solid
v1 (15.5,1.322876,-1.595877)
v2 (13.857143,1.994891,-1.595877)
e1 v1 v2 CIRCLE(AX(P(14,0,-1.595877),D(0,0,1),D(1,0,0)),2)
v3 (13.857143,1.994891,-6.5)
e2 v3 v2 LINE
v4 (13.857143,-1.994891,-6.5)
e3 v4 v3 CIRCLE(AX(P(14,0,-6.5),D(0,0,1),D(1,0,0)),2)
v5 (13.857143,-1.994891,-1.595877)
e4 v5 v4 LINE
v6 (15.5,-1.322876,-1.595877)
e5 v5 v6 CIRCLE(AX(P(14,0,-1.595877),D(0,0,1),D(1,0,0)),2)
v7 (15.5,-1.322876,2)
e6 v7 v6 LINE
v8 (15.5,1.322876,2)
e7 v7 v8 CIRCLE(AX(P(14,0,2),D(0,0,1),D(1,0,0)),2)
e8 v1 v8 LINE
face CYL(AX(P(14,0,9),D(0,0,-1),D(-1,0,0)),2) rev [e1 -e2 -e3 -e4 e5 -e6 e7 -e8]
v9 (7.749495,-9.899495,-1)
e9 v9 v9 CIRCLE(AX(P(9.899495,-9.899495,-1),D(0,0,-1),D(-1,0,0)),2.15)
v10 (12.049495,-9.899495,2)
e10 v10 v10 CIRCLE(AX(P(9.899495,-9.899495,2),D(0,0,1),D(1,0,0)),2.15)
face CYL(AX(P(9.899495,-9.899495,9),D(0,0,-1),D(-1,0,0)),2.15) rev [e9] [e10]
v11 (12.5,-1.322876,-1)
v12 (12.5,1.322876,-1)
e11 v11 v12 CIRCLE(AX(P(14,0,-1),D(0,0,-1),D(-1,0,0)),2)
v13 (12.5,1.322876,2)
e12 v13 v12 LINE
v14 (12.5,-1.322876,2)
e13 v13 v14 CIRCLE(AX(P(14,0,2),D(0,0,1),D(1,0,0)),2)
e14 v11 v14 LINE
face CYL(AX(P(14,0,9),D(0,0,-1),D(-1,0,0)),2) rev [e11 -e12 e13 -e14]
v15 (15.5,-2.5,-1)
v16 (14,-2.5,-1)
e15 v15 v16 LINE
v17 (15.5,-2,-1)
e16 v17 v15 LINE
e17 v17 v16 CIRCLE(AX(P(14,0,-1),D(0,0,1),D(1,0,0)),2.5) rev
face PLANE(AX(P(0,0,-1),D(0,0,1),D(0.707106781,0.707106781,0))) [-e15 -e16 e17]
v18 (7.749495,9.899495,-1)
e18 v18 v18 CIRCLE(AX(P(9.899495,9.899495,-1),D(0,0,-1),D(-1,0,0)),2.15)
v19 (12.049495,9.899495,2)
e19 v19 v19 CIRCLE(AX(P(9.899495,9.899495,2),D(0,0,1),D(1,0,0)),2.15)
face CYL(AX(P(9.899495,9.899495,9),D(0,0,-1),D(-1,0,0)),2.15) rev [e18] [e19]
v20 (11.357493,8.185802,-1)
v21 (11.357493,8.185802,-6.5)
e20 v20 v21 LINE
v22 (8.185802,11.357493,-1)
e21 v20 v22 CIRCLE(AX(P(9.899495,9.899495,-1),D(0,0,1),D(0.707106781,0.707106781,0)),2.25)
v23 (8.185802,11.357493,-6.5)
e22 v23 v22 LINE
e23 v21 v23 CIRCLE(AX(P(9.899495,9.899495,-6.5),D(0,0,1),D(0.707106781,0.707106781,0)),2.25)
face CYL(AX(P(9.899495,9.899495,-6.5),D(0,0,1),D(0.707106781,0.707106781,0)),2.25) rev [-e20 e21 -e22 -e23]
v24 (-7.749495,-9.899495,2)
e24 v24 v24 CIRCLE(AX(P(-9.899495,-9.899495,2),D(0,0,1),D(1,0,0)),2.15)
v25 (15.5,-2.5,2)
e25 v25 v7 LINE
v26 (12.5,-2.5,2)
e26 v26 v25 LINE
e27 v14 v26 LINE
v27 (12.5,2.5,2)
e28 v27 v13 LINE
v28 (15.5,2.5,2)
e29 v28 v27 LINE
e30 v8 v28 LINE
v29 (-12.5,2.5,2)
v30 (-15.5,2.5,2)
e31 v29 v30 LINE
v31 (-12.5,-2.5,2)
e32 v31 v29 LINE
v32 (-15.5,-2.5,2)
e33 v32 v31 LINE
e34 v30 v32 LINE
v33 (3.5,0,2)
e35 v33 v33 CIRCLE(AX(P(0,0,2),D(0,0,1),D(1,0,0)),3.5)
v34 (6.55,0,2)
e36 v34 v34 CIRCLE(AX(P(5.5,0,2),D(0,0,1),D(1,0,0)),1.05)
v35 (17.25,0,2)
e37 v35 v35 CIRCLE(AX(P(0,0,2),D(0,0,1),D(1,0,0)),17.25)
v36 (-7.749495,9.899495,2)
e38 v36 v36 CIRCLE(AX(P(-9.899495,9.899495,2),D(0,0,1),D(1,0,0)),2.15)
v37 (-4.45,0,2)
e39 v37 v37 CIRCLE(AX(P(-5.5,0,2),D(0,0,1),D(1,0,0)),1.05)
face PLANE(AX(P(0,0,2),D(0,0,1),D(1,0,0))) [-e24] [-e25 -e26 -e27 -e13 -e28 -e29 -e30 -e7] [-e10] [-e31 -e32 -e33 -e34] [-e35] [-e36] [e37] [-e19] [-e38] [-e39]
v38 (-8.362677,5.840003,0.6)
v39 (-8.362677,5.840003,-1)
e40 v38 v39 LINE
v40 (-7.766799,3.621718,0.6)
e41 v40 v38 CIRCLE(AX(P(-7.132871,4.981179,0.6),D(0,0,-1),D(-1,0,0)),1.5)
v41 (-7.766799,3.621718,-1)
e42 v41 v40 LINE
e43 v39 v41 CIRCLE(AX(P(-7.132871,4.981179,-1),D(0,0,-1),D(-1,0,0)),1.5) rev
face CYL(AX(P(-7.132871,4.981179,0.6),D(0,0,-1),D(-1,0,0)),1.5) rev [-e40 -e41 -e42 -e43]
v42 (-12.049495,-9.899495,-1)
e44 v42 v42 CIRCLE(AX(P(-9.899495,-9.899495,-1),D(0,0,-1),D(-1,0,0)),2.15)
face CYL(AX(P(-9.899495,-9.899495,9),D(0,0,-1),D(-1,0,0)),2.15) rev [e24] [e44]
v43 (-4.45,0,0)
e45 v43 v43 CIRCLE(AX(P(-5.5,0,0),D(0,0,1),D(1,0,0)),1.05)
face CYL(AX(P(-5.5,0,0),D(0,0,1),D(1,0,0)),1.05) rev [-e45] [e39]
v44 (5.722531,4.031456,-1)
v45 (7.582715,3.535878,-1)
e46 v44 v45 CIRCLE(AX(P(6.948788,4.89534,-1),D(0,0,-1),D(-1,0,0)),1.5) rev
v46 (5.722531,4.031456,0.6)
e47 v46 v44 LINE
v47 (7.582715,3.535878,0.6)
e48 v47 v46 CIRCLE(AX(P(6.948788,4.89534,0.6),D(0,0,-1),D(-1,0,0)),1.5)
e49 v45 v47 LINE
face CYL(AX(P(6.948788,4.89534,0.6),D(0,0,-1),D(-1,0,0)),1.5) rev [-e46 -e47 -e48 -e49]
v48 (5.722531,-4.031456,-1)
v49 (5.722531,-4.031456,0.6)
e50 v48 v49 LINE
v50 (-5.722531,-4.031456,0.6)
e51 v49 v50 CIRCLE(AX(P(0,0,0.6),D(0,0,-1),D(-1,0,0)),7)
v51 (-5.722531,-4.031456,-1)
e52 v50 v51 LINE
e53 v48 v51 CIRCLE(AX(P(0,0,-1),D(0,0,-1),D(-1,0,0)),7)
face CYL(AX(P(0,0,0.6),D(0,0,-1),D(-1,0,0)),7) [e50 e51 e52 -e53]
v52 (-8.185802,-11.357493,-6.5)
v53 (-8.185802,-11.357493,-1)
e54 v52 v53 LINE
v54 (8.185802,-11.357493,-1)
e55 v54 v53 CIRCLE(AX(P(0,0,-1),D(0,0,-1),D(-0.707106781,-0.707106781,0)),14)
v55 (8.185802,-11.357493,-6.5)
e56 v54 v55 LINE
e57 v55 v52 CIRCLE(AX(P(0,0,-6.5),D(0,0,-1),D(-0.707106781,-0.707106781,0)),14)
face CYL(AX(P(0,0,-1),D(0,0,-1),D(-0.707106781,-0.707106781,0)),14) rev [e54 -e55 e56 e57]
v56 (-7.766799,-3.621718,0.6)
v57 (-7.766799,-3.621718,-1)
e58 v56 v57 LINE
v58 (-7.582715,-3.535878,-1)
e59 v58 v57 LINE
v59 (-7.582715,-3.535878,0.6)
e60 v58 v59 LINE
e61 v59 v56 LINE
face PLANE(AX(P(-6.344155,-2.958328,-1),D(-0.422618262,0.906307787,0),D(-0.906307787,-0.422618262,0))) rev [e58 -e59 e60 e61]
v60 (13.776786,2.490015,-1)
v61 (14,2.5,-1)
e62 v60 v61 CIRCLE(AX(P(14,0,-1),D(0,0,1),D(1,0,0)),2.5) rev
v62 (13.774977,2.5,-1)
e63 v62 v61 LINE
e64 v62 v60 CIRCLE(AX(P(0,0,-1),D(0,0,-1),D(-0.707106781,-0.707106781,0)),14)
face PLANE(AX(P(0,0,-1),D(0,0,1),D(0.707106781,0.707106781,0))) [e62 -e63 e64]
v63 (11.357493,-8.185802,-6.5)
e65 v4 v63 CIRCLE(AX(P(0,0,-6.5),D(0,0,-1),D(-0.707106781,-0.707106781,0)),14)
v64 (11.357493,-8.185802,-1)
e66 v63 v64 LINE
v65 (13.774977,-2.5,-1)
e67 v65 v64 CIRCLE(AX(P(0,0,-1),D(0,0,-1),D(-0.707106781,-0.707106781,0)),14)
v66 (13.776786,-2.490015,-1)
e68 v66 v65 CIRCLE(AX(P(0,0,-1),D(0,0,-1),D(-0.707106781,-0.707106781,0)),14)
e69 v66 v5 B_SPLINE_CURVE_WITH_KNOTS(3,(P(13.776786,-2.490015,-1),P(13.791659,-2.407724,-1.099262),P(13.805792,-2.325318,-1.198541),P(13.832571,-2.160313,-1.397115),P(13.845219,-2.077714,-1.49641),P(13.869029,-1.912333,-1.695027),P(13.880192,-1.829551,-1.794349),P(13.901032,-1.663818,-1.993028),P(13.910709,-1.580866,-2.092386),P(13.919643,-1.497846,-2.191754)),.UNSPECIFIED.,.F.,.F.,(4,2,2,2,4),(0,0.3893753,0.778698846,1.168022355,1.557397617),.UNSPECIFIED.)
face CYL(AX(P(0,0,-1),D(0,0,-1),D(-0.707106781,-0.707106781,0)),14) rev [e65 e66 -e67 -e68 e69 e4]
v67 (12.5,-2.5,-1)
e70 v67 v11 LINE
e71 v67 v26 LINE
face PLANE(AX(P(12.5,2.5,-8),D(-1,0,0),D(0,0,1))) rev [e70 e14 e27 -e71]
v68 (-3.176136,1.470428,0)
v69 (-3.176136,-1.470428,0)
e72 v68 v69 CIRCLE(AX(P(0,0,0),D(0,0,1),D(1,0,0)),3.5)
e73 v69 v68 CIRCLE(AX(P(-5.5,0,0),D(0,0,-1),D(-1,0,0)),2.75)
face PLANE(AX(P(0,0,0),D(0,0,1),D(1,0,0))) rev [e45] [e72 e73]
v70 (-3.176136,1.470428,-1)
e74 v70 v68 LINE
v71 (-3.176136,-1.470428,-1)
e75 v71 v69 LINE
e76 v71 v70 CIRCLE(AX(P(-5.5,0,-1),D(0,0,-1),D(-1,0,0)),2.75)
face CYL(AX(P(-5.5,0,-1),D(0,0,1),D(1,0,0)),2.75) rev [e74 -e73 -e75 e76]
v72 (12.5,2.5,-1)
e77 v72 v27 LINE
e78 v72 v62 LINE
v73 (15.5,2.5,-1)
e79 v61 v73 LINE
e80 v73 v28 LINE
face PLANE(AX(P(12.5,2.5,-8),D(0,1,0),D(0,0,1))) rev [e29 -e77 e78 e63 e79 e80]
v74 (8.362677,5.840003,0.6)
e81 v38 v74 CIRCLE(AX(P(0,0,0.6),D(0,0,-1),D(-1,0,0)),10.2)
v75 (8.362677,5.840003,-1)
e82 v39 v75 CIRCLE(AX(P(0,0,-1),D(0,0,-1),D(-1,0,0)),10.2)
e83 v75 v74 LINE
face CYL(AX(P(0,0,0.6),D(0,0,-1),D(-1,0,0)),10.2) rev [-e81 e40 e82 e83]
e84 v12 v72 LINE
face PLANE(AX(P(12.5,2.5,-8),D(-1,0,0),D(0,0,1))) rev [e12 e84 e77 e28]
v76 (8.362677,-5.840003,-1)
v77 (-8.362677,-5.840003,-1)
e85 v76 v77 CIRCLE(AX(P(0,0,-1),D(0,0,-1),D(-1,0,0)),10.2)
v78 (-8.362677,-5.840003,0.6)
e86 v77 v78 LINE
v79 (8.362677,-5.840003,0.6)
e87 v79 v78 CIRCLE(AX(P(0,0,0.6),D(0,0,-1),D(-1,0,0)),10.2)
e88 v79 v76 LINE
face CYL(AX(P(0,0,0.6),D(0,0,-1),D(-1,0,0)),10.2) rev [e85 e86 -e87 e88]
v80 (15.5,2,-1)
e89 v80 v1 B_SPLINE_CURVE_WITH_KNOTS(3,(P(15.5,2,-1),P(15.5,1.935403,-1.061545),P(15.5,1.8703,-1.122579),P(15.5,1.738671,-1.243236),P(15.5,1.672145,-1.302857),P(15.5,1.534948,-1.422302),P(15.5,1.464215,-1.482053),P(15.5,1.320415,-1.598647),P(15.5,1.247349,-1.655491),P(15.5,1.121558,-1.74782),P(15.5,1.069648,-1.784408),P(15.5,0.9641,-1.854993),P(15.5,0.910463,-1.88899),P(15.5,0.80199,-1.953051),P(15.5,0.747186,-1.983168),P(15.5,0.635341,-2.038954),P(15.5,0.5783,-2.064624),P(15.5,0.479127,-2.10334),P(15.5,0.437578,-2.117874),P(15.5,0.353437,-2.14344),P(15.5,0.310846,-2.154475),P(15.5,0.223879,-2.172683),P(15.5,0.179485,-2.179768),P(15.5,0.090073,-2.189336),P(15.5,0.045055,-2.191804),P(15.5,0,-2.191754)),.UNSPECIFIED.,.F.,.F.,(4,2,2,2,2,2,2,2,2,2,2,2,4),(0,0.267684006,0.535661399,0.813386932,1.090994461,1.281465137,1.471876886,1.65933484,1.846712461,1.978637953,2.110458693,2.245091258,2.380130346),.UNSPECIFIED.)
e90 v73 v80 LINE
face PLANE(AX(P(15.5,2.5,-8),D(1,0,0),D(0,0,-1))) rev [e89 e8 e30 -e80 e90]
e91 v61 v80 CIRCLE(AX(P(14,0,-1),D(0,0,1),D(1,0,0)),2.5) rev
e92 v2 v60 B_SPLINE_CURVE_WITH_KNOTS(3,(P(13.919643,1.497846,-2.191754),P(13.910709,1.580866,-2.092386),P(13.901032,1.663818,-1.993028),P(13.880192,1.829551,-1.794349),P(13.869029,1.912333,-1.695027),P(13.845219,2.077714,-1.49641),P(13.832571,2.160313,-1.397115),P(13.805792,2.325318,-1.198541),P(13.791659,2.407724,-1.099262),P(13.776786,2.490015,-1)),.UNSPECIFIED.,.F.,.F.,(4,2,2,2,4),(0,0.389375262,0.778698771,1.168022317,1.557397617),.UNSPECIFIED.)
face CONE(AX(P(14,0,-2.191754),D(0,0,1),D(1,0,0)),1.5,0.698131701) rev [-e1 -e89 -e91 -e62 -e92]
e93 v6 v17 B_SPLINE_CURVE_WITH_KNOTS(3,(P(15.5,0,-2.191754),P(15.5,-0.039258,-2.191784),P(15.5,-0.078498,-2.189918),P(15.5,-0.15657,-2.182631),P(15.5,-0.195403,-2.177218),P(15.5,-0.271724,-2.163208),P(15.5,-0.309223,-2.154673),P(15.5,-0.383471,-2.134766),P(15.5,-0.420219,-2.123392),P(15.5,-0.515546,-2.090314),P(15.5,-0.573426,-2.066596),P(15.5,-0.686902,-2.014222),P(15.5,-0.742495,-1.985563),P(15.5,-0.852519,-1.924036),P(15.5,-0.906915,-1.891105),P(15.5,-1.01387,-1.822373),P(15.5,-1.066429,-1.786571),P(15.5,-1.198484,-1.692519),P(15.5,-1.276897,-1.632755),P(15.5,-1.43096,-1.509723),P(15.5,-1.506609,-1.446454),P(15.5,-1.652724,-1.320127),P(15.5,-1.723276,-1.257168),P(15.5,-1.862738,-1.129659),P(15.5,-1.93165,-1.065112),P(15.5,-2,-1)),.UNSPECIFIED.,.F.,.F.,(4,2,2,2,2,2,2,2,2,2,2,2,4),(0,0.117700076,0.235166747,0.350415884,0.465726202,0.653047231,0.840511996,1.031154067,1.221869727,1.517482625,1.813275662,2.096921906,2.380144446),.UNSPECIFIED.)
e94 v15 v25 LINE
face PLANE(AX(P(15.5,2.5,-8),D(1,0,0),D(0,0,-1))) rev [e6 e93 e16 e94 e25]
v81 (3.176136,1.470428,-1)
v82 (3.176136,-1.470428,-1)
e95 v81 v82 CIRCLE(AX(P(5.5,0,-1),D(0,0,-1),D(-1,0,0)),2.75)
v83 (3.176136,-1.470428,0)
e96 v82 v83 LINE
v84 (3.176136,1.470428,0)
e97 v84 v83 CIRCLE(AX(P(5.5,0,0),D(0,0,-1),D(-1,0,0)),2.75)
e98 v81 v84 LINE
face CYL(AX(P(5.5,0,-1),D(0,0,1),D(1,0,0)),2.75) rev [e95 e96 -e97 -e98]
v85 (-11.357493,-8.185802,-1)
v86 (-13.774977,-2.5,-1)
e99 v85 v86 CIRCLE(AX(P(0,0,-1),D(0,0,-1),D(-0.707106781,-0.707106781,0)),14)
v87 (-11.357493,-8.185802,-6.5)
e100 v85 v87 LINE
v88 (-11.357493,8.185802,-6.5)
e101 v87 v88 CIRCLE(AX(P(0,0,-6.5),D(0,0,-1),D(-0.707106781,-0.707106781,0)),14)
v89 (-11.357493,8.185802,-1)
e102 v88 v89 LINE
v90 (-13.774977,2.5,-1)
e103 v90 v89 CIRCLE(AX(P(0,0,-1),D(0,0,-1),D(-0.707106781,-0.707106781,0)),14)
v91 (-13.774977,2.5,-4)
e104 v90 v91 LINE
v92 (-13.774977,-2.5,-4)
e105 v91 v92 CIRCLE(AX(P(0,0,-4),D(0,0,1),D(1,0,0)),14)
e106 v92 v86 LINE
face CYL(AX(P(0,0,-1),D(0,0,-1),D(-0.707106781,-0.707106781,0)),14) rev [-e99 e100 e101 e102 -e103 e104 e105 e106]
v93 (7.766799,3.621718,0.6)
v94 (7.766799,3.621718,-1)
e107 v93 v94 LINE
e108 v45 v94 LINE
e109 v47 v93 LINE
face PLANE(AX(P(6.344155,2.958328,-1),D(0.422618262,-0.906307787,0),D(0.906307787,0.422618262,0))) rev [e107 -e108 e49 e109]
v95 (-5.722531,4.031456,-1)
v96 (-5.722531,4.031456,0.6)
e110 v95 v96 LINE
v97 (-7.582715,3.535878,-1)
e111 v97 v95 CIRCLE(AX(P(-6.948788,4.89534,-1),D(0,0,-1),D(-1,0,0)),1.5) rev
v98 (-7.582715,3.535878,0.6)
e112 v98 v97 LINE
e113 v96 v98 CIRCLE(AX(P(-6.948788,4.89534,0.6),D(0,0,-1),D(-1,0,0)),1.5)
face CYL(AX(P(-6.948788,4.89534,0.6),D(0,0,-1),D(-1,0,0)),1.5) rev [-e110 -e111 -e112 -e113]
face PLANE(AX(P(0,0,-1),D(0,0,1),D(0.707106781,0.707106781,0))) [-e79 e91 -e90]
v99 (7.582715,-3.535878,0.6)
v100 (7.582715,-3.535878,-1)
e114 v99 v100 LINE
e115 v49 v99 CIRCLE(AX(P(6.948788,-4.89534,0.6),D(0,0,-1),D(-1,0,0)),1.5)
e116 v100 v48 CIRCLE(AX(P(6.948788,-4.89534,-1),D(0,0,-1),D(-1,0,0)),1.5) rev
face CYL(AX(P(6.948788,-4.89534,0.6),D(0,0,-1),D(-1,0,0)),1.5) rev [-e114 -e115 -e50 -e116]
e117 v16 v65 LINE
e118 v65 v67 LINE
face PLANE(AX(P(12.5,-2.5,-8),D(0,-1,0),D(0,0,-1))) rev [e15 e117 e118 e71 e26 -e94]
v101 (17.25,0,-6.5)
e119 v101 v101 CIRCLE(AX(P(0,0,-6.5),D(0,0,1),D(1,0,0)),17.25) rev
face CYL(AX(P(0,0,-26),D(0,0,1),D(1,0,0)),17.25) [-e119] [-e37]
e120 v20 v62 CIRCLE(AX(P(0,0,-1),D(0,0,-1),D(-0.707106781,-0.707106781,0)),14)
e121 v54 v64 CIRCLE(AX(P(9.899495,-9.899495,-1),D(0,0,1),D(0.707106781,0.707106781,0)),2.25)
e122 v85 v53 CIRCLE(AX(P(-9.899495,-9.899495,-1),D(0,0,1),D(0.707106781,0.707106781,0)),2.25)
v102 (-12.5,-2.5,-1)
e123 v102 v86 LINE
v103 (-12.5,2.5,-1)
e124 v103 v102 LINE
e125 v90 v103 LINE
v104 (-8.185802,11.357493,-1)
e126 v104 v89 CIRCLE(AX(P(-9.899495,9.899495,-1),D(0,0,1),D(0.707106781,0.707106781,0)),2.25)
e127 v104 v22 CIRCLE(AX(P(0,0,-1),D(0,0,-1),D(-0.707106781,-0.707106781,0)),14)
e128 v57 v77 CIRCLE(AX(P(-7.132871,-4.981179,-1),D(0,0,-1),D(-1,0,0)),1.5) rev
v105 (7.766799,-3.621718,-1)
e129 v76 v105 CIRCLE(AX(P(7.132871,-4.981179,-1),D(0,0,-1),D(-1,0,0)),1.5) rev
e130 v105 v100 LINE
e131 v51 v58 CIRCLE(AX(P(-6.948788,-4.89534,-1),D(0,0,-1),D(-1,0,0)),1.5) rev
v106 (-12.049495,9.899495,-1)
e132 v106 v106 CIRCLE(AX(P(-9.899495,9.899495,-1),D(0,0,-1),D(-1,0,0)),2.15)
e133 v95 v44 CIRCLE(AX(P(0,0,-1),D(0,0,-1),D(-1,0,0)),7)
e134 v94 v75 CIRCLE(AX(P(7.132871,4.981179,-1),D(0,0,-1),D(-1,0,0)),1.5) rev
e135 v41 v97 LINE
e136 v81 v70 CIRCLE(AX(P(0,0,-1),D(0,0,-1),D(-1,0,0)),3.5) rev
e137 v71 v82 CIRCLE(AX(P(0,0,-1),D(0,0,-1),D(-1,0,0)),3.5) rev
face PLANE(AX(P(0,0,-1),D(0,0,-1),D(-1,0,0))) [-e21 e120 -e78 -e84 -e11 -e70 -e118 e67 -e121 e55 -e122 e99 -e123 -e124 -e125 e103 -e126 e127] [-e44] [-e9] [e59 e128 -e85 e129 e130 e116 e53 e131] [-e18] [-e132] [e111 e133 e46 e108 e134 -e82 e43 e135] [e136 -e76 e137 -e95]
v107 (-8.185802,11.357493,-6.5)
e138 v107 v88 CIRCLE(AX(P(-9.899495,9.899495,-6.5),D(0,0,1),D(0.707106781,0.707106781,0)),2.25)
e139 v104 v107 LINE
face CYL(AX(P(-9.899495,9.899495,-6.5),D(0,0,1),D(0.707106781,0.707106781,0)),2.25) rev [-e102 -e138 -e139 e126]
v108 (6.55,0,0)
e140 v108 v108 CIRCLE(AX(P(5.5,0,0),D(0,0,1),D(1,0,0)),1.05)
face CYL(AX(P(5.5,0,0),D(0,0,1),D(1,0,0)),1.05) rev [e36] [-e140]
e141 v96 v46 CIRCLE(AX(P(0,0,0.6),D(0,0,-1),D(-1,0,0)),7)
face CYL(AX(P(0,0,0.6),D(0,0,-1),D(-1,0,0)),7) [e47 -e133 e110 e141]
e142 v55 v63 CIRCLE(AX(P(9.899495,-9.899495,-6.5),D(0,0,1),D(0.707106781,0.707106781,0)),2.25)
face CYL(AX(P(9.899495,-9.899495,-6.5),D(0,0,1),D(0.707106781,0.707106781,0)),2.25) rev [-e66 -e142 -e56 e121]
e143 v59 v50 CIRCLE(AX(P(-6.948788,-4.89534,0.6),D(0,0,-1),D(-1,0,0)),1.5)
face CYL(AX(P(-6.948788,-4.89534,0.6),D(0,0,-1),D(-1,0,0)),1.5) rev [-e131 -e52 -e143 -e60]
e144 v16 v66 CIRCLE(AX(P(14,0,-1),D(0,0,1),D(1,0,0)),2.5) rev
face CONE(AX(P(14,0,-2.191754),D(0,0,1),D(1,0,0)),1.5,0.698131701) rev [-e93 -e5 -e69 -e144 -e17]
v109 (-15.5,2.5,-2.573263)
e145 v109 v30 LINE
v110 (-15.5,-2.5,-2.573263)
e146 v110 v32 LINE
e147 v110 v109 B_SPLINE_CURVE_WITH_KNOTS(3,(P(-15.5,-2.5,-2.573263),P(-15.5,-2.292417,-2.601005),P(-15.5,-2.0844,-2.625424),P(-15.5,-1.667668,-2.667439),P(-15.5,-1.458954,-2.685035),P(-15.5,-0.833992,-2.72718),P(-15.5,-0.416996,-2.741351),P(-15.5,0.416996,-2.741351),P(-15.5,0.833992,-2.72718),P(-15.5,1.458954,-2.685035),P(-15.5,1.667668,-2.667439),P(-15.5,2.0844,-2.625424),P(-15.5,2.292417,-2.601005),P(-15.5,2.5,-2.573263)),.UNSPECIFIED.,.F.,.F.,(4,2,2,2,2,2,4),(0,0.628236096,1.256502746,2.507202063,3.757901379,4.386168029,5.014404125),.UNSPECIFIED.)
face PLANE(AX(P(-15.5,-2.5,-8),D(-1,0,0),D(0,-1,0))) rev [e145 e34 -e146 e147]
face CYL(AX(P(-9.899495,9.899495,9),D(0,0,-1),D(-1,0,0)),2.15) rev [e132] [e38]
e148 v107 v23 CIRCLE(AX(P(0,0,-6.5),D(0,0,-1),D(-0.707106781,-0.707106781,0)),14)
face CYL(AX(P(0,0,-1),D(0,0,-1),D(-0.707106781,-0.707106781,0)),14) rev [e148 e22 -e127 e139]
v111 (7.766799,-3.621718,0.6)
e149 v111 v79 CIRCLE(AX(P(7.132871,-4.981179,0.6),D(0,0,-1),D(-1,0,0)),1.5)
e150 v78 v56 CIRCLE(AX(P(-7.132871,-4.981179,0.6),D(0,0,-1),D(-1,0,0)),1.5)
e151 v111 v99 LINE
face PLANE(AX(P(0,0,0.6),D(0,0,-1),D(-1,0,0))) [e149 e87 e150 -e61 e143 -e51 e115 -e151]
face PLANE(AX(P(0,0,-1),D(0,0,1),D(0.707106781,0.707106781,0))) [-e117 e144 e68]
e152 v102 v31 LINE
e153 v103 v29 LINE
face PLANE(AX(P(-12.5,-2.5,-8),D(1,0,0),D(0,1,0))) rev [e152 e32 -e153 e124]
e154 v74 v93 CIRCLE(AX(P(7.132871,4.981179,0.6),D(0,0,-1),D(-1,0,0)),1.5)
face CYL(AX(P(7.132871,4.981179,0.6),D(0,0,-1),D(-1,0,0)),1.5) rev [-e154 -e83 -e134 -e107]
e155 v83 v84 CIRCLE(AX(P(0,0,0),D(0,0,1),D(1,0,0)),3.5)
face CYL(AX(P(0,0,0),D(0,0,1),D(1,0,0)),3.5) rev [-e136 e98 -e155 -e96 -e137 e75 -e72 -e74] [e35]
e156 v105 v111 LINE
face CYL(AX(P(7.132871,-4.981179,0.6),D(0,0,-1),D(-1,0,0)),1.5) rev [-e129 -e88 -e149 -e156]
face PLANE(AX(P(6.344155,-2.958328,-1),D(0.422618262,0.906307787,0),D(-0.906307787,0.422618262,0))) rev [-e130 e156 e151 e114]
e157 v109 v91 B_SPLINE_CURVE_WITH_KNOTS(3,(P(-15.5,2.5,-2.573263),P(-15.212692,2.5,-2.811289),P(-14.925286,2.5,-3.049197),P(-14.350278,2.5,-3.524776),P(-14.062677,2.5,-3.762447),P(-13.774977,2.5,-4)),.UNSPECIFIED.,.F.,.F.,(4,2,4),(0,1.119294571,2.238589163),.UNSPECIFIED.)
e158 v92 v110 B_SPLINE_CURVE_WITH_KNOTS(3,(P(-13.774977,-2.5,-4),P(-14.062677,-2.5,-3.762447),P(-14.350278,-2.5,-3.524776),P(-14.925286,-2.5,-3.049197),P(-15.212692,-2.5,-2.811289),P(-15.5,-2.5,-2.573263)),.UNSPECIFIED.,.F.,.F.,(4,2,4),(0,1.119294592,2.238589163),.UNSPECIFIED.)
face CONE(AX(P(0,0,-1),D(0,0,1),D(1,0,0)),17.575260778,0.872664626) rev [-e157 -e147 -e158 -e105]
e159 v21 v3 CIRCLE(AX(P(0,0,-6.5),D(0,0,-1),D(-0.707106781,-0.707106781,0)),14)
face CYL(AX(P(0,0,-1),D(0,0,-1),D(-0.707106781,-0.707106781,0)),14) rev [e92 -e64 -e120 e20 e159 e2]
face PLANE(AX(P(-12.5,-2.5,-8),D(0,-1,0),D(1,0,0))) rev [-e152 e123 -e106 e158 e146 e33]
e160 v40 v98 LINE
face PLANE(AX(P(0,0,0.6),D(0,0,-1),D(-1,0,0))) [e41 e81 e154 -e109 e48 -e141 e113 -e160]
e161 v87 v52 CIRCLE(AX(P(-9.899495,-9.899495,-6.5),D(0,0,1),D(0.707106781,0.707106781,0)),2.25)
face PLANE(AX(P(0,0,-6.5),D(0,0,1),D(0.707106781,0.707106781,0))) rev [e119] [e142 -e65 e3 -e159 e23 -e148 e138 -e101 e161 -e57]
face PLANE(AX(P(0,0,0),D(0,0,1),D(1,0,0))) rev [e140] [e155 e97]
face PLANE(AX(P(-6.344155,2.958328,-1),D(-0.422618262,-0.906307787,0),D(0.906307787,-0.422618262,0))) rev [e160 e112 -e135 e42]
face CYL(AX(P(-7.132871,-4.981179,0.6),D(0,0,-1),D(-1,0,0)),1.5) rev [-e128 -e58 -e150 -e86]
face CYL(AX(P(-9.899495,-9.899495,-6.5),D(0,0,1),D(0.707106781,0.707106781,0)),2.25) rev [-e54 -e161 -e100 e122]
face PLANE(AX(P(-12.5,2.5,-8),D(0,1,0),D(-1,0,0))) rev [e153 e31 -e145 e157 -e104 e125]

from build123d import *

# Parameters (mm, degrees)
SKETCH_1_R               = 20
EXTRUDE_1_DEPTH          = 2
SKETCH_2_R               = 3.5
CUT_EXTRUDE_1_DEPTH      = 2
SKETCH_3_R               = 1.05
CUT_EXTRUDE_2_DEPTH      = 2
EXTRUDE_START            = 1
SKETCH_5_R               = 20
SKETCH_5_R_2             = 8.25
EXTRUDE_3_DEPTH          = 1
EXTRUDE_4_DEPTH          = 1
SKETCH_9_R               = 10.2
SKETCH_9_R_2             = 7
CUT_EXTRUDE_3_DEPTH      = 1.6
EXTRUDE_START_2          = 1.6
EXTRUDE_5_DEPTH          = 1.6
PATTERN_CIRCULAR_2_COUNT = 2
SKETCH_13_R              = 2.75
CUT_EXTRUDE_4_DEPTH      = 1.6
FILLET_1_R               = 1.5
SKETCH_14_R              = 2.15
CUT_EXTRUDE_5_DEPTH      = 10
SKETCH_15_W              = 3
SKETCH_15_H              = 5
CUT_EXTRUDE_6_DEPTH      = 10
CHAMFER_1_SIZE           = 1
OTHER_START              = -10.264946541
OTHER_4149_OUTLINE_R     = 17.5
OTHER_4149_DEPTH         = 5.5
MOVE_BODY_2_ANGLE        = 45
CHAMFER_2_SIZE           = 1.191753593
CHAMFER_2_SIZE_2         = 1
CHAMFER_3_SIZE           = 3.575260778
CHAMFER_3_SIZE_2         = 3
SKETCH_19_OUTSIDE_W      = 53.44
SKETCH_19_OUTSIDE_H      = 53.44
SKETCH_19_OUTSIDE_R      = 17.25
CUT_EXTRUDE_7_DEPTH      = 25
CUT_EXTRUDE_9_DEPTH      = 10
CUT_EXTRUDE_9_DEPTH_BACK = 10
SKETCH_21_R              = 2
SKETCH_22_OUTSIDE_W      = 53.44
SKETCH_22_OUTSIDE_H      = 53.44
SKETCH_22_OUTSIDE_R      = 17.25
CUT_EXTRUDE_10_DEPTH     = 10


with BuildPart() as part:
    # 草图1 → 凸台-拉伸1 (new body)
    with BuildSketch(Plane.XY):
        Circle(SKETCH_1_R)
    extrude(amount=EXTRUDE_1_DEPTH)

    # 草图2 → 切除-拉伸1 (cut)
    with BuildSketch(Plane.XY.offset(2)):
        Circle(SKETCH_2_R)
    extrude(amount=-CUT_EXTRUDE_1_DEPTH, mode=Mode.SUBTRACT)

    # 草图3 → 切除-拉伸2 (cut)
    with BuildSketch(Plane.XY.offset(2)):
        with Locations((-5.5, 0)):
            Circle(SKETCH_3_R)
        with Locations((5.5, 0)):
            Circle(SKETCH_3_R)
    extrude(amount=-CUT_EXTRUDE_2_DEPTH, mode=Mode.SUBTRACT)

    # 草图5 → 凸台-拉伸3 (add)
    with BuildSketch(Plane(origin=(0, 0, 0), x_dir=(-1, 0, 0), z_dir=(0, 0, -1)).offset(EXTRUDE_START)):
        Circle(SKETCH_5_R)
        Circle(SKETCH_5_R_2, mode=Mode.SUBTRACT)
    extrude(amount=-EXTRUDE_3_DEPTH)

    # 草图8 → 凸台-拉伸4 (add)
    with BuildSketch(Plane(origin=(0, 0, 0), x_dir=(-1, 0, 0), z_dir=(0, 0, -1))):
        with BuildLine():
            ThreePointArc((3.176136364, 1.470427761), (6.265465545, 2.641318326), (8.25, 0))
            ThreePointArc((8.25, 0), (0, 8.25), (-8.25, 0))
            ThreePointArc((-8.25, 0), (-6.265465545, 2.641318326), (-3.176136364, 1.470427761))
            ThreePointArc((-3.176136364, 1.470427761), (0, 3.5), (3.176136364, 1.470427761))
        make_face()
        with BuildLine():
            ThreePointArc((-8.25, 0), (0, -8.25), (8.25, 0))
            ThreePointArc((8.25, 0), (6.265465545, -2.641318326), (3.176136364, -1.470427761))
            ThreePointArc((3.176136364, -1.470427761), (0, -3.5), (-3.176136364, -1.470427761))
            ThreePointArc((-3.176136364, -1.470427761), (-6.265465545, -2.641318326), (-8.25, 0))
        make_face()
    extrude(amount=EXTRUDE_4_DEPTH)

    # 草图9 → 切除-拉伸3 (cut)
    with BuildSketch(Plane(origin=(0, 0, -1), x_dir=(-1, 0, 0), z_dir=(0, 0, -1))):
        Circle(SKETCH_9_R)
        Circle(SKETCH_9_R_2, mode=Mode.SUBTRACT)
    extrude(amount=-CUT_EXTRUDE_3_DEPTH, mode=Mode.SUBTRACT)

    # 草图12 → 凸台-拉伸5 (add)
    with BuildSketch(Plane(origin=(0, 0, 0.6), x_dir=(-1, 0, 0), z_dir=(0, 0, -1)).offset(EXTRUDE_START_2)):
        with BuildLine():
            Line((6.344154509, 2.958327832), (9.244339428, 4.31070627))
            ThreePointArc((9.244339428, 4.31070627), (10.2, 0), (9.244339428, -4.31070627))
            Line((9.244339428, -4.31070627), (6.344154509, -2.958327832))
            ThreePointArc((6.344154509, -2.958327832), (7, 0), (6.344154509, 2.958327832))
        make_face()
    extrude_5 = extrude(amount=-EXTRUDE_5_DEPTH)

    # 阵列(圆周)2: 凸台-拉伸5 ×2 about axis
    pattern_circular_2_axis = Axis((0, 0, 0), (0, 0, 1))
    for i in range(1, PATTERN_CIRCULAR_2_COUNT):
        add(extrude_5.rotate(pattern_circular_2_axis, i * 360 / PATTERN_CIRCULAR_2_COUNT))

    # 草图13 → 切除-拉伸4 (cut)
    with BuildSketch(Plane(origin=(0, 0, 0), x_dir=(-1, 0, 0), z_dir=(0, 0, -1))):
        with Locations((5.5, 0)):
            Circle(SKETCH_13_R)
        with Locations((-5.5, 0)):
            Circle(SKETCH_13_R)
    extrude(amount=CUT_EXTRUDE_4_DEPTH, mode=Mode.SUBTRACT)

    # 圆角1
    # the kernel refuses this fillet: 1.5 mm, written as the material it adds along each edge
    with BuildSketch(Plane(origin=(6.344154509, 2.958327832, -1), x_dir=(0.9063077870366493, 0.42261826174070116, 0), z_dir=(0, 0, 1)), Plane(origin=(-6.344154509, -2.958327832, -1), x_dir=(-0.9063077870366493, -0.4226182617407009, 0), z_dir=(0, 0, 1))) as fillet_1_piece_1:
        with BuildLine():
            CenterArc((1.366600265, 1.5), FILLET_1_R, 190.164248622, 79.835751378)
            ThreePointArc((-0.109858605, 1.235294118), (-0.027518743, 0.620084766), (0, 0))
            Line((0, 0), (1.366600265, 0))
        make_face()
    extrude(amount=1.6)
    with BuildSketch(Plane(origin=(9.244339428, 4.31070627, -1), x_dir=(-0.4994572119030246, 0.8663385559226007, 0), z_dir=(0, 0, 1)), Plane(origin=(-9.244339428, -4.31070627, -1), x_dir=(0.49945721190302483, -0.8663385559226006, 0), z_dir=(0, 0, 1))) as fillet_1_piece_2:
        with BuildLine():
            CenterArc((1.635444705, 1.494373677), FILLET_1_R, 175.035904079, 99.928191842)
            Line((0.141071027, 1.624170876), (0, 0))
            ThreePointArc((0, 0), (0.882620952, -0.038258995), (1.765241903, 0))
        make_face()
    extrude(amount=1.6)
    with BuildSketch(Plane(origin=(9.244339428, -4.31070627, -1), x_dir=(-0.4994572119030251, -0.8663385559226003, 0), z_dir=(0, 0, 1)), Plane(origin=(-9.244339428, 4.31070627, -1), x_dir=(0.4994572119030254, 0.8663385559226003, 0), z_dir=(0, 0, 1))) as fillet_1_piece_3:
        with BuildLine():
            CenterArc((1.635444705, -1.494373677), FILLET_1_R, 85.035904079, 99.928191842)
            Line((0.141071027, -1.624170876), (0, 0))
            ThreePointArc((0, 0), (0.882620952, 0.038258995), (1.765241903, 0))
        make_face()
    extrude(amount=1.6)
    with BuildSketch(Plane(origin=(-6.344154509, 2.958327832, -1), x_dir=(-0.9063077870366493, 0.42261826174070083, 0), z_dir=(0, 0, 1)), Plane(origin=(6.344154509, -2.958327832, -1), x_dir=(0.9063077870366492, -0.4226182617407011, 0), z_dir=(0, 0, 1))) as fillet_1_piece_4:
        with BuildLine():
            CenterArc((1.366600265, -1.5), FILLET_1_R, 90, 79.835751378)
            ThreePointArc((-0.109858605, -1.235294118), (-0.027518743, -0.620084766), (0, 0))
            Line((0, 0), (1.366600265, 0))
        make_face()
    extrude(amount=1.6)

    # 草图14 → 切除-拉伸5 (cut)
    with BuildSketch(Plane(origin=(0, 0, -1), x_dir=(-1, 0, 0), z_dir=(0, 0, -1))):
        with Locations((9.899494937, -9.899494937)):
            Circle(SKETCH_14_R)
        with Locations((-9.899494937, -9.899494937)):
            Circle(SKETCH_14_R)
        with Locations((-9.899494937, 9.899494937)):
            Circle(SKETCH_14_R)
        with Locations((9.899494937, 9.899494937)):
            Circle(SKETCH_14_R)
    extrude(amount=-CUT_EXTRUDE_5_DEPTH, mode=Mode.SUBTRACT)

    # 草图15 → 切除-拉伸6 (cut)
    with BuildSketch(Plane.XY.offset(2)):
        with Locations((-14, 0)):
            Rectangle(SKETCH_15_W, SKETCH_15_H)
        with Locations((14, 0)):
            Rectangle(SKETCH_15_W, SKETCH_15_H)
    extrude(amount=-CUT_EXTRUDE_6_DEPTH, mode=Mode.SUBTRACT)

    # 倒角1
    chamfer_1_edges = [part.edges().sort_by_distance(p)[0] for p in [
        (20, 0, -1),
    ]]
    chamfer(chamfer_1_edges, length=CHAMFER_1_SIZE - 0.0001)  # a hair under: the kernel refuses the full size


with BuildPart() as body_2:
    # Other 4149: read off the stored shape, not the designer's step
    # Other 4149 outline → Other 4149 (new body)
    with BuildSketch(Plane.XY.offset(OTHER_START)):
        with Locations((-19.945533416, 28.7887379)):
            Circle(OTHER_4149_OUTLINE_R)
        with BuildLine():
            ThreePointArc((-9.043722475, 20.005201129), (-8.985378308, 17.828582791), (-11.161996645, 17.88692696))
            ThreePointArc((-11.161996645, 17.88692696), (-14.242692887, 16.0029016), (-17.70280961, 14.969541472))
            ThreePointArc((-17.70280961, 14.969541472), (-19.945533416, 12.5387379), (-22.188257221, 14.969541472))
            ThreePointArc((-22.188257221, 14.969541472), (-29.845028352, 18.889242964), (-33.764729844, 26.546014095))
            ThreePointArc((-33.764729844, 26.546014095), (-36.195533416, 28.788737901), (-33.764729844, 31.031461706))
            ThreePointArc((-33.764729844, 31.031461706), (-29.845028352, 38.688232837), (-22.188257221, 42.607934329))
            ThreePointArc((-22.188257221, 42.607934329), (-19.945533416, 45.0387379), (-17.70280961, 42.607934329))
            ThreePointArc((-17.70280961, 42.607934329), (-10.046038479, 38.688232837), (-6.126336987, 31.031461706))
            ThreePointArc((-6.126336987, 31.031461706), (-3.695533416, 28.788737901), (-6.126336987, 26.546014095))
            ThreePointArc((-6.126336987, 26.546014095), (-7.159697115, 23.085897372), (-9.043722475, 20.005201129))
        make_face(mode=Mode.SUBTRACT)
    extrude(amount=OTHER_4149_DEPTH)


with BuildPart() as body_2_1:
    # Move Body 2: read off the stored shape, not the designer's step
    # Move Body 2: moved
    add(body_2.part.moved(Location((19.9455334, -28.7887379, 3.7649465))).rotate(Axis((0, 0, 0), (0, 0, 1)), MOVE_BODY_2_ANGLE))

    # Combine 1: union part
    add(part.part)

    # 倒角2
    # the kernel refuses this chamfer: 1.191753593, 1 mm, written as the material it takes off along each edge
    with BuildSketch(Plane(origin=(13.999999989, -1.1e-08, -1.000000041), x_dir=(1, 0, 0), z_dir=(0, 1, 0))) as chamfer_2_piece_1_section:
        Polygon((1.5, CHAMFER_2_SIZE), (1.5 + CHAMFER_2_SIZE_2, 0), (1.5, 0), align=None)
    chamfer_2_piece_1 = revolve(axis=Axis((13.999999989, -1.1e-08, -1.000000041), (0, 0, -1)), revolution_arc=210.449028023, mode=Mode.PRIVATE)
    chamfer_2_piece_1 = split(chamfer_2_piece_1, bisect_by=Plane(origin=(15.5, -1.1e-08, -1.000000041), z_dir=(-1, 0, 0)), keep=Keep.TOP, mode=Mode.PRIVATE)
    add(chamfer_2_piece_1, mode=Mode.SUBTRACT)
    with BuildSketch(Plane(origin=(13.999999989, -1.1e-08, -1.000000041), x_dir=(-0.8620803404154466, -0.506771631673664, 0), z_dir=(0.506771631673664, -0.8620803404154466, 0))) as chamfer_2_piece_2_section:
        Polygon((1.5, CHAMFER_2_SIZE), (1.5 + CHAMFER_2_SIZE_2, 0), (1.5, 0), align=None)
    chamfer_2_piece_2 = revolve(axis=Axis((13.999999989, -1.1e-08, -1.000000041), (0, 0, -1)), revolution_arc=210.449027996, mode=Mode.PRIVATE)
    chamfer_2_piece_2 = split(chamfer_2_piece_2, bisect_by=Plane(origin=(15.5, -1.1e-08, -1.000000041), z_dir=(-1, 0, 0)), keep=Keep.TOP, mode=Mode.PRIVATE)
    add(chamfer_2_piece_2, mode=Mode.SUBTRACT)

    # 倒角3
    # the kernel refuses this chamfer: 3.575260778, 3 mm, written as the material it takes off along each edge
    with BuildSketch(Plane(origin=(-1.1e-08, -1.1e-08, -1.000000041), x_dir=(-0.6691326945986151, -0.743142945212559, 0), z_dir=(0.743142945212559, -0.6691326945986151, 0))) as chamfer_3_piece_1_section:
        Polygon((14 + CHAMFER_3_SIZE, 0), (14, CHAMFER_3_SIZE_2), (14, 0), align=None)
    chamfer_3_piece_1 = revolve(axis=Axis((-1.1e-08, -1.1e-08, -1.000000041), (0, 0, -1)), revolution_arc=95.999678085, mode=Mode.PRIVATE)
    chamfer_3_piece_1 = split(chamfer_3_piece_1, bisect_by=Plane(origin=(-15.5, -1.1e-08, -1.000000041), z_dir=(1, 0, 0)), keep=Keep.TOP, mode=Mode.PRIVATE)
    chamfer_3_piece_1 = split(chamfer_3_piece_1, bisect_by=Plane(origin=(-1.1e-08, -2.5, -1.000000041), z_dir=(0, 1, 0)), keep=Keep.TOP, mode=Mode.PRIVATE)
    chamfer_3_piece_1 = split(chamfer_3_piece_1, bisect_by=Plane(origin=(-1.1e-08, 2.5, -1.000000041), z_dir=(0, -1, 0)), keep=Keep.TOP, mode=Mode.PRIVATE)
    add(chamfer_3_piece_1, mode=Mode.SUBTRACT)

    # 草图19 outside → 切除-拉伸7 (cut)
    with BuildSketch(Plane(origin=(0, 0, -1), x_dir=(-1, 0, 0), z_dir=(0, 0, -1))):
        Rectangle(SKETCH_19_OUTSIDE_W, SKETCH_19_OUTSIDE_H)
        with Locations(Location((0, 0, 0), (0, 0, 180))):
            Circle(SKETCH_19_OUTSIDE_R, mode=Mode.SUBTRACT)
    extrude(amount=CUT_EXTRUDE_7_DEPTH, mode=Mode.SUBTRACT)

    # 草图21 → 切除-拉伸9 (cut, two sides: drawn at the far end of the back side and taken through both)
    with BuildSketch(Plane(origin=(0, 0, -1), x_dir=(-1, 0, 0), z_dir=(0, 0, -1)).offset(-CUT_EXTRUDE_9_DEPTH_BACK)):
        with Locations((-14, 0)):
            Circle(SKETCH_21_R)
    extrude(amount=CUT_EXTRUDE_9_DEPTH + CUT_EXTRUDE_9_DEPTH_BACK, mode=Mode.SUBTRACT)

    # 草图22 outside → 切除-拉伸10 (cut)
    with BuildSketch(Plane(origin=(0, 0, -6.5), x_dir=(-1, 0, 0), z_dir=(0, 0, -1))):
        Rectangle(SKETCH_22_OUTSIDE_W, SKETCH_22_OUTSIDE_H)
        with Locations(Location((0, 0, 0), (0, 0, 180))):
            Circle(SKETCH_22_OUTSIDE_R, mode=Mode.SUBTRACT)
    extrude(amount=-CUT_EXTRUDE_10_DEPTH, mode=Mode.SUBTRACT)


solid = body_2_1.part
